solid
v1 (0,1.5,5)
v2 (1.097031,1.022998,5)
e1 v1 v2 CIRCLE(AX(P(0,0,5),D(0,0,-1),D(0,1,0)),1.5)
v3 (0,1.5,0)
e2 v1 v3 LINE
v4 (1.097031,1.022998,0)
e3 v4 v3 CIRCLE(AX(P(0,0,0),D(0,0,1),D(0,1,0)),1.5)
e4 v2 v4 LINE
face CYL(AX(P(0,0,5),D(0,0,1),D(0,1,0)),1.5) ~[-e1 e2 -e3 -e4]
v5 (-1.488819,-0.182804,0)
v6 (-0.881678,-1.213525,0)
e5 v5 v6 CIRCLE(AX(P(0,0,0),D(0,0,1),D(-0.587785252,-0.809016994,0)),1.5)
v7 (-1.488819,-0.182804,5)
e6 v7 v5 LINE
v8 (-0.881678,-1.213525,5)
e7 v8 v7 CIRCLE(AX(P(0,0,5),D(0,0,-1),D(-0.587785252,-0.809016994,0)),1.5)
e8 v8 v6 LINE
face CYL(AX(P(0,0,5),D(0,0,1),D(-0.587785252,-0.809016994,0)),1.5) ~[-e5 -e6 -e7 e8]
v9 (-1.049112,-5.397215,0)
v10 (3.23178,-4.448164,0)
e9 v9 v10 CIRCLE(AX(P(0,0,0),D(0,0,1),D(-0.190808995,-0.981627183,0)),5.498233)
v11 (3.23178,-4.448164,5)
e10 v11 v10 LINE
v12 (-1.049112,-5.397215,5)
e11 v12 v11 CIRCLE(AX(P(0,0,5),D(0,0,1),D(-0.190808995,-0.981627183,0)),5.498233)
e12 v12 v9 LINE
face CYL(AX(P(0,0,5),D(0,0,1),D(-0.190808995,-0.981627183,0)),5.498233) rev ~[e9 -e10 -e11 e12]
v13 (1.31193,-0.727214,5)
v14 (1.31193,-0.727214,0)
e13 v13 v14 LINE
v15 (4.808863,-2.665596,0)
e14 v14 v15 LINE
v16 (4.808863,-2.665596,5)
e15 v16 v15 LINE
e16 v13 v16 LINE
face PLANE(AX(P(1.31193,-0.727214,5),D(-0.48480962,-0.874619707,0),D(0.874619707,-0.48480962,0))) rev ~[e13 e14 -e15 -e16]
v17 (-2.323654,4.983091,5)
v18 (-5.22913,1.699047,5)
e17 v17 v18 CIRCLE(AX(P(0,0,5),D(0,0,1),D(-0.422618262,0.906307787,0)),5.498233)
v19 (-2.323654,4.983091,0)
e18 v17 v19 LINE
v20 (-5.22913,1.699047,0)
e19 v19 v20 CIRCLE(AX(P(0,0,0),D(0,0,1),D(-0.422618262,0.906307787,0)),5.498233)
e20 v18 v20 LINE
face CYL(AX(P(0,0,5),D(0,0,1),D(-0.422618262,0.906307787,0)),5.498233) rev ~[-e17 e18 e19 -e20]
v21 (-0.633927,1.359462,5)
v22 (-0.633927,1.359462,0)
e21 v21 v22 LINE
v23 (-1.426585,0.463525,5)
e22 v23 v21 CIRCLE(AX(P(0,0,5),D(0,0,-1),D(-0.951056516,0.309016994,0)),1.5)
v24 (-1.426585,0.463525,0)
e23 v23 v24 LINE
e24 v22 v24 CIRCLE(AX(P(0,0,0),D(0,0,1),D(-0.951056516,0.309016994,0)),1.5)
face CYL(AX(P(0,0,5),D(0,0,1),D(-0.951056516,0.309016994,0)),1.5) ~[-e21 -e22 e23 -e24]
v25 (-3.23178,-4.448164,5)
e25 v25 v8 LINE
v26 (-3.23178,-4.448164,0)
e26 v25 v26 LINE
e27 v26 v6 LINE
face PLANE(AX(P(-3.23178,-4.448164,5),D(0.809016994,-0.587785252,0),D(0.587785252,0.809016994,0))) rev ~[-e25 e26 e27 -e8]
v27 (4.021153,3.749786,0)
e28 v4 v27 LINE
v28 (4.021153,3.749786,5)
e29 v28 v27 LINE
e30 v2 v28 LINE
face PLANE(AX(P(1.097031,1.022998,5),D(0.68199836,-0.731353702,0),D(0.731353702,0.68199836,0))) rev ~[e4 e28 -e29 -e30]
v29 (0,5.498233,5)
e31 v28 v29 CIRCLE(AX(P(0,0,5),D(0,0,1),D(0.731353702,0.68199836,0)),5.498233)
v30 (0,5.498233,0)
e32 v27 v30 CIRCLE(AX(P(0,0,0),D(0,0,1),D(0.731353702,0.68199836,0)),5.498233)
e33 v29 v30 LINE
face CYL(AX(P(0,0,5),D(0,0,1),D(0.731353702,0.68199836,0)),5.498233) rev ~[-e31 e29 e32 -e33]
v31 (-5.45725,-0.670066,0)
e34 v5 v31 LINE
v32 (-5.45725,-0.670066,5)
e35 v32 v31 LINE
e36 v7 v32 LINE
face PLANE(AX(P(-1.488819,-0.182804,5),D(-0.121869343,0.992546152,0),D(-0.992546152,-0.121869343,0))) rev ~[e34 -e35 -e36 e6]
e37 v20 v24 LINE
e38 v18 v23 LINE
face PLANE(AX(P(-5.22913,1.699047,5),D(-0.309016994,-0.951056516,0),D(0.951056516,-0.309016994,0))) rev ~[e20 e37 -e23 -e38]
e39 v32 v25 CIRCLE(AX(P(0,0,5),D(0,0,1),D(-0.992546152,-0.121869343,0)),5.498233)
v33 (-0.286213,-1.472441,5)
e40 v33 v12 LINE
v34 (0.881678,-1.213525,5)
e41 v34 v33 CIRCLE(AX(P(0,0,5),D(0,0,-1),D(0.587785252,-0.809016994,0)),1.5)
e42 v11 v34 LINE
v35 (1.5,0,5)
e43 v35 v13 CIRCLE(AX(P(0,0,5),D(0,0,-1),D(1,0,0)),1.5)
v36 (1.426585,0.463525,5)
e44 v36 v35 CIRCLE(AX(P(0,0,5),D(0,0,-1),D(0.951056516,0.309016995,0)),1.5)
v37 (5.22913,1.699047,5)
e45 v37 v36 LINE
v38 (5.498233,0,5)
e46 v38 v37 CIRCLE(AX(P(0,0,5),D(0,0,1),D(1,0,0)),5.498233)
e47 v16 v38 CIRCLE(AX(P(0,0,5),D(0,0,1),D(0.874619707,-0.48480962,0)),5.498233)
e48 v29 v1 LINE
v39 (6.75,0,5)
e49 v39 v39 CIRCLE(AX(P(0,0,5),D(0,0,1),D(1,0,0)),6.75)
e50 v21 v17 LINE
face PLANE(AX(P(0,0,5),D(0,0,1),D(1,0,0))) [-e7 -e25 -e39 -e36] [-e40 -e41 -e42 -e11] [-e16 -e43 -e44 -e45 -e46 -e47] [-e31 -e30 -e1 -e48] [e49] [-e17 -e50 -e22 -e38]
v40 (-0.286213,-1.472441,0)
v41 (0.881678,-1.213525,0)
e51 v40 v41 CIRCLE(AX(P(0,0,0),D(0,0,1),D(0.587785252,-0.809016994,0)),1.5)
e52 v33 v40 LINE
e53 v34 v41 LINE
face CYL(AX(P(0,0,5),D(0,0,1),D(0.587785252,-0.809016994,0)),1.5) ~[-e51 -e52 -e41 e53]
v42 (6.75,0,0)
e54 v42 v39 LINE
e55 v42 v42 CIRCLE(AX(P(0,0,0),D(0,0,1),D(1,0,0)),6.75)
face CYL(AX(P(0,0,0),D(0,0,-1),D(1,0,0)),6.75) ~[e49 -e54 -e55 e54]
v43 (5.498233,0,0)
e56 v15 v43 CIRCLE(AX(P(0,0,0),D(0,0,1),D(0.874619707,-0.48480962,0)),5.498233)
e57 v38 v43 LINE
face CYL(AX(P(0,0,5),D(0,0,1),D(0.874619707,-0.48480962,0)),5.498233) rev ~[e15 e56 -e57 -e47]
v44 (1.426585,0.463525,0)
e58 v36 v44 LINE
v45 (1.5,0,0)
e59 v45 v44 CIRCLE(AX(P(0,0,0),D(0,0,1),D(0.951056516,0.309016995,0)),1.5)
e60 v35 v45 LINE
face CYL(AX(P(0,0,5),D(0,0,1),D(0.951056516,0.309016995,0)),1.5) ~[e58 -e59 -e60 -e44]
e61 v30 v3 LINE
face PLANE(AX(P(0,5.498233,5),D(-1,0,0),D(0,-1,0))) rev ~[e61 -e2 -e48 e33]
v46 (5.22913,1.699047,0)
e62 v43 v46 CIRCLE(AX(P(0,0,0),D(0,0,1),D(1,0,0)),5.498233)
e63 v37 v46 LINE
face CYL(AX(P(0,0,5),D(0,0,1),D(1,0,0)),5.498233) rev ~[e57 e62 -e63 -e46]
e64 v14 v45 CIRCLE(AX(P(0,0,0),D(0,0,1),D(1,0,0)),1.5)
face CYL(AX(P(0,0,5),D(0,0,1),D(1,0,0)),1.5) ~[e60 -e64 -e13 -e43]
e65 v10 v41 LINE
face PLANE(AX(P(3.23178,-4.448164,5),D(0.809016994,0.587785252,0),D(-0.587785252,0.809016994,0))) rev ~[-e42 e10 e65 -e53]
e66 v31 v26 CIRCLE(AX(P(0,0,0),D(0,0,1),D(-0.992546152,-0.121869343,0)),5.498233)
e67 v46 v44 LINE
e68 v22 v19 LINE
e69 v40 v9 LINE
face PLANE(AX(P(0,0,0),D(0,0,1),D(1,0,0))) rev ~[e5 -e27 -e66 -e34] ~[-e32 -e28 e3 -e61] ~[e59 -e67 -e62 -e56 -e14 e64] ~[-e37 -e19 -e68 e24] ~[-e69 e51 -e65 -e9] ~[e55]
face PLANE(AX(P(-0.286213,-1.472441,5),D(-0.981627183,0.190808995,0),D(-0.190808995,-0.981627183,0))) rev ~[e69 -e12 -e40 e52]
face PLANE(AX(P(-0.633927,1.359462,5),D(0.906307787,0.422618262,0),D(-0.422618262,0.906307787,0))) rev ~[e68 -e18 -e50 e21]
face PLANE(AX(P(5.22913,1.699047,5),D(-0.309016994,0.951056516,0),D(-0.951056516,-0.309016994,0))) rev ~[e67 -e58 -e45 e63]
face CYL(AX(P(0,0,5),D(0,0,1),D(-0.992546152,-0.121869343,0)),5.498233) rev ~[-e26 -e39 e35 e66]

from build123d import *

# Parameters (mm, degrees)
F0_R     = 6.75
F1_DEPTH = 5
F3_DEPTH = 25


# Not quite as in the source:
# - a feature names something its author has since deleted; it is built from what else it names


with BuildPart() as f1:
    # F0 (on Top) → F1 (new body)
    with BuildSketch(Plane.XY):
        Circle(F0_R)
    extrude(amount=F1_DEPTH)

    # F2 (on face) → F3 (cut)
    with BuildSketch(Plane.XY.offset(5)):
        with BuildLine():
            Line((1.0970305524, 1.0229975401), (4.02115299, 3.7497858268))
            ThreePointArc((4.02115299, 3.7497858268), (2.192415253, 5.04220988), (0, 5.4982329084))
            Line((0, 5.4982329084), (0, 1.5))
            ThreePointArc((0, 1.5), (0.5981236034, 1.3755901116), (1.0970305524, 1.0229975401))
        make_face()
        with BuildLine():
            Line((-0.6339273926, 1.3594616806), (-2.3236536344, 4.9830912999))
            ThreePointArc((-2.3236536344, 4.9830912999), (-4.117932991, 3.6432393549), (-5.2291302357, 1.6990474077))
            Line((-5.2291302357, 1.6990474077), (-1.4265847744, 0.4635254916))
            ThreePointArc((-1.4265847744, 0.4635254916), (-1.1234335812, 0.9939300723), (-0.6339273926, 1.3594616806))
        make_face()
        with BuildLine():
            ThreePointArc((-5.4572499141, -0.6700660344), (-4.7374378048, -2.7905641295), (-3.2317802172, -4.448163862))
            Line((-3.2317802172, -4.448163862), (-0.8816778784, -1.2135254916))
            ThreePointArc((-0.8816778784, -1.2135254916), (-1.2924437407, -0.7613075444), (-1.4888192275, -0.1828040151))
            Line((-1.4888192275, -0.1828040151), (-5.4572499141, -0.6700660344))
        make_face()
        with BuildLine():
            ThreePointArc((-1.0491122976, -5.3972148839), (1.190035408, -5.3679028347), (3.2317802172, -4.448163862))
            Line((3.2317802172, -4.448163862), (0.8816778784, -1.2135254916))
            ThreePointArc((0.8816778784, -1.2135254916), (0.3246594209, -1.4644440107), (-0.2862134931, -1.4724407752))
            Line((-0.2862134931, -1.4724407752), (-1.0491122976, -5.3972148839))
        make_face()
        with BuildLine():
            ThreePointArc((4.8088628562, -2.6655962084), (5.3231012166, -1.3766475779), (5.4982329084, 0))
            ThreePointArc((5.4982329084, 0), (5.4305405375, 0.8601131237), (5.2291302357, 1.6990474077))
            Line((5.2291302357, 1.6990474077), (1.4265847744, 0.4635254916))
            ThreePointArc((1.4265847744, 0.4635254916), (1.4815325109, 0.2346516976), (1.5, 0))
            ThreePointArc((1.5, 0), (1.4522214606, -0.3755700061), (1.3119295607, -0.7272144304))
            Line((1.3119295607, -0.7272144304), (4.8088628562, -2.6655962084))
        make_face()
    extrude(amount=-F3_DEPTH, mode=Mode.SUBTRACT)


solid = f1.part
